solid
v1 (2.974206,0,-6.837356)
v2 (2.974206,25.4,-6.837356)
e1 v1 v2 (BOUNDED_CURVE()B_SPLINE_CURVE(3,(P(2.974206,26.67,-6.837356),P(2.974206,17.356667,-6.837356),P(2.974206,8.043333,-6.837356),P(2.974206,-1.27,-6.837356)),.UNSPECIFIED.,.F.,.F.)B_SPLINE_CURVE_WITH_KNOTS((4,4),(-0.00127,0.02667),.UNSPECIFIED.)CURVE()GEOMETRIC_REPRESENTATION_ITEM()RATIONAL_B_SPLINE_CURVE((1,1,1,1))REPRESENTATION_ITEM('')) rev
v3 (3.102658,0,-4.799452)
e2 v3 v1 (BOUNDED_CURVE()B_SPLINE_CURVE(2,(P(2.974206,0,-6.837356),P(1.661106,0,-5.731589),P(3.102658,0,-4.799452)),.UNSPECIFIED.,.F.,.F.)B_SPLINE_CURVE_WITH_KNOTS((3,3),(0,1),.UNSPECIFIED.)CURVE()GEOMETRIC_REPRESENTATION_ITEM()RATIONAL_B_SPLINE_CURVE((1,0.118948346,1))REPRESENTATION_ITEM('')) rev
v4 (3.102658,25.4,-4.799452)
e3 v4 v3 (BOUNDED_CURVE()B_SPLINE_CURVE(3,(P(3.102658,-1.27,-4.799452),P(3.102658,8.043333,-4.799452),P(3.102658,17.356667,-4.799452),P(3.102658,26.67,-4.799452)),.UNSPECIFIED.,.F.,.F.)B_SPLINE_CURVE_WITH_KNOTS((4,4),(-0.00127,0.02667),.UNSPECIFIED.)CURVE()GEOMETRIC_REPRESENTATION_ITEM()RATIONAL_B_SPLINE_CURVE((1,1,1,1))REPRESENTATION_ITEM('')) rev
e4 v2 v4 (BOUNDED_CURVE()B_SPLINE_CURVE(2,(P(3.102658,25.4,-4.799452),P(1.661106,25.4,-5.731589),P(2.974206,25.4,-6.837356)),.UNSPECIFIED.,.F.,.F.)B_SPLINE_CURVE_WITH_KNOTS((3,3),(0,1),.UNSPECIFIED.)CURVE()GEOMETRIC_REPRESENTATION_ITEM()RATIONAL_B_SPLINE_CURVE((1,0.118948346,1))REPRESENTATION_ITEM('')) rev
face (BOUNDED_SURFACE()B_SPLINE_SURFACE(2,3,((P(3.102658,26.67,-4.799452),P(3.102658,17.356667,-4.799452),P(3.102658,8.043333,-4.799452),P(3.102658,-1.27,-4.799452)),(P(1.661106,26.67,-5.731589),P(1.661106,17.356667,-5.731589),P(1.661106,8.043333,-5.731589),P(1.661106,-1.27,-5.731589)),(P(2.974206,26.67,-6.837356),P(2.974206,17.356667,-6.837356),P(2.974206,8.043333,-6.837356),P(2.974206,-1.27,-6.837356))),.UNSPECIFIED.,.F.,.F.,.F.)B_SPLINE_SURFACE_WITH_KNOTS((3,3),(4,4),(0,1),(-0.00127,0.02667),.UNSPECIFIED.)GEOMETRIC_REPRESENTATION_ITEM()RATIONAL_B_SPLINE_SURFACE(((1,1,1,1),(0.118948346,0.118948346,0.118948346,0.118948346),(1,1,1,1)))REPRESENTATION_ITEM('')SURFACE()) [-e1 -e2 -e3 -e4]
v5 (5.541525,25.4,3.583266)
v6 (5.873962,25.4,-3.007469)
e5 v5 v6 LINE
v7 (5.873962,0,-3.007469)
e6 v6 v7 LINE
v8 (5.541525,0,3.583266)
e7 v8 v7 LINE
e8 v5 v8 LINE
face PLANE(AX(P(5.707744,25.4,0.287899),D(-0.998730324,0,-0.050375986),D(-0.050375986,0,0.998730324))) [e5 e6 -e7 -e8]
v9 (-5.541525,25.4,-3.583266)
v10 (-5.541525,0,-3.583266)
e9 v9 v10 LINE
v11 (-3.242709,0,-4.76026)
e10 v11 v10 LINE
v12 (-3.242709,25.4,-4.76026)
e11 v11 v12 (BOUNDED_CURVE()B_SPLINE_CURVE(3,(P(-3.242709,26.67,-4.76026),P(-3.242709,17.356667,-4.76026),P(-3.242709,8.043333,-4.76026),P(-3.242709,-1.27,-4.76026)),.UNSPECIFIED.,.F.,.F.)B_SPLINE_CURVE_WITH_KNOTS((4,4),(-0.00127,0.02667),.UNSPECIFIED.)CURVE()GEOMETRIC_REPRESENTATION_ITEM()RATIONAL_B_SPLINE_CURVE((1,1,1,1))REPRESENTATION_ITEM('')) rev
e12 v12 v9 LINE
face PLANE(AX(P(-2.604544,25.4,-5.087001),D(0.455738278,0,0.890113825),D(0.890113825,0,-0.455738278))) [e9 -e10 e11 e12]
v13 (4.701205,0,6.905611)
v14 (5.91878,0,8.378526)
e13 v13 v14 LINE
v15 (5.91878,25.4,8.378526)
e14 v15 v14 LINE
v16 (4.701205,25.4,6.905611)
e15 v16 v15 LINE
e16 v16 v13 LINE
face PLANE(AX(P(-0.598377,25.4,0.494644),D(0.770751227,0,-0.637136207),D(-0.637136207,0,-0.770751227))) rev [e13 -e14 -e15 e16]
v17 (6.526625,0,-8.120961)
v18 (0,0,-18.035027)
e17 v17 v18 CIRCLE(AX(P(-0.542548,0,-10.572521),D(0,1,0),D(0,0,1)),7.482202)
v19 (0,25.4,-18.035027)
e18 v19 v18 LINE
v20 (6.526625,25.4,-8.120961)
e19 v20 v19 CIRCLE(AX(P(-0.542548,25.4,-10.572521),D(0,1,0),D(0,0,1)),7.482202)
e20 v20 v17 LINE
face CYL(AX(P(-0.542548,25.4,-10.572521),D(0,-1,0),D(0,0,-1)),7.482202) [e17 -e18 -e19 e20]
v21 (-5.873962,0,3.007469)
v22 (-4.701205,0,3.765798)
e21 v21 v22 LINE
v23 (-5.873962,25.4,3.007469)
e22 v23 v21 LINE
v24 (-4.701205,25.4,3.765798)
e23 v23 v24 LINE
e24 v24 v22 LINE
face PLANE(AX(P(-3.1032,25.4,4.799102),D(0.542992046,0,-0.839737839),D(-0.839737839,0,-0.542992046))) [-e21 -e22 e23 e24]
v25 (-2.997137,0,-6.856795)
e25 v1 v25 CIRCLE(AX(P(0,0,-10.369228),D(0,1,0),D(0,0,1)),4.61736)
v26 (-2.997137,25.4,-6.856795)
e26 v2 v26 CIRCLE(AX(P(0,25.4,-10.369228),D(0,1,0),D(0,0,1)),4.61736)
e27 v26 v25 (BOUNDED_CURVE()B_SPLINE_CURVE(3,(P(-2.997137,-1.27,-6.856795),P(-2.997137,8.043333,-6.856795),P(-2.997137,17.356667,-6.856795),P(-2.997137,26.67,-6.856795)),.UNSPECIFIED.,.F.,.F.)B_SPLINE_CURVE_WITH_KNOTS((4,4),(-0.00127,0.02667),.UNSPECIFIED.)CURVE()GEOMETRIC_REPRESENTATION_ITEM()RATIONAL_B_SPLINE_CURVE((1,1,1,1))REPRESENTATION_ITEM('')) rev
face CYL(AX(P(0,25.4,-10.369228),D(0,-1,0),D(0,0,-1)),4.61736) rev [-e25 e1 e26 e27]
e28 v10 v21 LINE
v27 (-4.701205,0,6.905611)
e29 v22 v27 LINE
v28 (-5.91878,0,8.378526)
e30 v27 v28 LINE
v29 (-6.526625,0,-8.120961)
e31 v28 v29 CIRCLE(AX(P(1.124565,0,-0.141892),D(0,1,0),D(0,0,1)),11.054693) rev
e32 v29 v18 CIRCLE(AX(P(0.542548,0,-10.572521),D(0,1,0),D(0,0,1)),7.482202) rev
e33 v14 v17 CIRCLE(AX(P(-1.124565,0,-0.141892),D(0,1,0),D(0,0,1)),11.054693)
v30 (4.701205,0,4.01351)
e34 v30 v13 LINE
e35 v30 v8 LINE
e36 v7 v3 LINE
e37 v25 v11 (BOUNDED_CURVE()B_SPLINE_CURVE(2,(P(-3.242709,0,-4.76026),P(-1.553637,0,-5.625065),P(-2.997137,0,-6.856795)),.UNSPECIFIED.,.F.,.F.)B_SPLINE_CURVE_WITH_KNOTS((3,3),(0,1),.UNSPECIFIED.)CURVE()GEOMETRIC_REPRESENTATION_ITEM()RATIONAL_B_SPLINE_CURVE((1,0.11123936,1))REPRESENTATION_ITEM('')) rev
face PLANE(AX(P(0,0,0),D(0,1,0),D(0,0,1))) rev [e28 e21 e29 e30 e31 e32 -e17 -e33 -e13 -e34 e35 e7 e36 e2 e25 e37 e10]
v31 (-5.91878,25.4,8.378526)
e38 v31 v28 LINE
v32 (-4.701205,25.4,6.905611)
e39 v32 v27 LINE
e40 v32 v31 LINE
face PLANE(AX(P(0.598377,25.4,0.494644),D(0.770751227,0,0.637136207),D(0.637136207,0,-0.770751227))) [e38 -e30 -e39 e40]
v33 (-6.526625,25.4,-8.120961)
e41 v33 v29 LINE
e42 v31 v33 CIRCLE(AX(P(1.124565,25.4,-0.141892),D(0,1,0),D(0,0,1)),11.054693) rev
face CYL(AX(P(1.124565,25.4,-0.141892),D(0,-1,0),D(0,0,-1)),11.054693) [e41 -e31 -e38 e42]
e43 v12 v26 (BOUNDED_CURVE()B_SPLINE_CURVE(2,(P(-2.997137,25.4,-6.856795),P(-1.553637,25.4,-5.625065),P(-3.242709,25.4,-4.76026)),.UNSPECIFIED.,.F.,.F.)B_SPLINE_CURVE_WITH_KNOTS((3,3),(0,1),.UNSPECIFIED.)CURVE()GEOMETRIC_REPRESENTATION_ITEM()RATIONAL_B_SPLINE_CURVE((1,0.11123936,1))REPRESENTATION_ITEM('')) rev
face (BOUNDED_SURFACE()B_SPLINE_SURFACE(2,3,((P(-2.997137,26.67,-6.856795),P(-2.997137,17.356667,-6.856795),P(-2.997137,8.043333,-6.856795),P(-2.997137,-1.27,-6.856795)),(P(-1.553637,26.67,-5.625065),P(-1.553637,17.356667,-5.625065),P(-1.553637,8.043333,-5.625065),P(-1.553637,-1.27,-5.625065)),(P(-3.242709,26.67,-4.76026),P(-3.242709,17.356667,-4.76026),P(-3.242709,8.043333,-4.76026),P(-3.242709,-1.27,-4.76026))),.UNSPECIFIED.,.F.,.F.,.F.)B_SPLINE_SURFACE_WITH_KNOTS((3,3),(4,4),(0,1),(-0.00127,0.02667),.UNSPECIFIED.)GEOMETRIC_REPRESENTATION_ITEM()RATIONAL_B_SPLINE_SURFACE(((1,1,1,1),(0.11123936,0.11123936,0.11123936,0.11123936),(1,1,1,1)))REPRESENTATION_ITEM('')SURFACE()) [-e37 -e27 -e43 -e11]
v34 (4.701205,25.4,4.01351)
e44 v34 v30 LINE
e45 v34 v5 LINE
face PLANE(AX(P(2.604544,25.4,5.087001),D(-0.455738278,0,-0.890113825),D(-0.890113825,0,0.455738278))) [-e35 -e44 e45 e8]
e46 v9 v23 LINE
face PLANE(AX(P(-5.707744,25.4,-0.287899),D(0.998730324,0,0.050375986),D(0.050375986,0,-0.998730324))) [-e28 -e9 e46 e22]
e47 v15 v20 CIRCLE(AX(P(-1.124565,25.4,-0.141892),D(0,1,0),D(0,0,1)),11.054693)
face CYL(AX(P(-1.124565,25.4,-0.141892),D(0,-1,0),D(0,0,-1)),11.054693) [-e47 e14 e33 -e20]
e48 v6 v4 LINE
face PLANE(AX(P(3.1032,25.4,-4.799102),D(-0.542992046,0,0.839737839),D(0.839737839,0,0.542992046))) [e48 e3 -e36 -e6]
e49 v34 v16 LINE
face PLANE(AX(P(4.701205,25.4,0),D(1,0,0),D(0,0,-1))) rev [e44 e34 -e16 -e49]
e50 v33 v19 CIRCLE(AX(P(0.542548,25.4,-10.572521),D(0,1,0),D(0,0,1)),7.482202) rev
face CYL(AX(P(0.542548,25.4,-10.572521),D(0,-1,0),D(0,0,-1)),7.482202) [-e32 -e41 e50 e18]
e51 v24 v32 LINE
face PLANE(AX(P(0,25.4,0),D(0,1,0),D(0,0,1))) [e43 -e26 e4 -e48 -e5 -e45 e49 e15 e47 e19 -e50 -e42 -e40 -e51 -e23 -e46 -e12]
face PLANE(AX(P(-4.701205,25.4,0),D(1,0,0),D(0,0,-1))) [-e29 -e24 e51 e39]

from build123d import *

# Parameters (mm, degrees)
BOSS_EXTRUDE1_DEPTH = 25.4


with BuildPart() as part:
    # Sketch3 → Boss-Extrude1 (new body)
    with BuildSketch(Plane(origin=(0, 0, 0), x_dir=(1, 0, 0), z_dir=(0, 1, 0))):
        with BuildLine():
            Line((-5.541525375, 3.58326618), (-2.47962532, 5.150959008))
            Line((-2.47962532, 5.150959008), (-2.47962532, 6.474170352))
            ThreePointArc((-2.47962532, 6.474170352), (-2.221563685, 14.417025562), (4.617359972, 10.369227654))
            ThreePointArc((4.617359972, 10.369227654), (4.047797908, 8.147663968), (2.47962532, 6.474170352))
            Line((2.47962532, 6.474170352), (2.47962532, 5.20231788))
            Line((2.47962532, 5.20231788), (5.873962228, 3.007468661))
            Line((5.873962228, 3.007468661), (5.541525375, -3.58326618))
            Line((5.541525375, -3.58326618), (4.701204968, -4.013510228))
            Line((4.701204968, -4.013510228), (4.701204968, -6.905610932))
            Line((4.701204968, -6.905610932), (5.918780254, -8.378526195))
            ThreePointArc((5.918780254, -8.378526195), (9.922634137, -0.265088751), (6.526624698, 8.120961152))
            ThreePointArc((6.526624698, 8.120961152), (5.706991897, 14.686716316), (0, 18.035026682))
            ThreePointArc((0, 18.035026682), (-5.706991897, 14.686716316), (-6.526624698, 8.120961152))
            ThreePointArc((-6.526624698, 8.120961152), (-9.922634137, -0.265088751), (-5.918780254, -8.378526195))
            Line((-5.918780254, -8.378526195), (-4.701204968, -6.905610932))
            Line((-4.701204968, -6.905610932), (-4.701204968, -3.765798027))
            Line((-4.701204968, -3.765798027), (-5.873962228, -3.007468661))
            Line((-5.873962228, -3.007468661), (-5.541525375, 3.58326618))
        make_face()
        with BuildLine():
            Line((-2.47962532, 6.474170352), (-2.47962532, 5.150959008))
            Line((-2.47962532, 5.150959008), (-1.063503338, 5.876013463))
            ThreePointArc((-1.063503338, 5.876013463), (-1.79663243, 6.115743784), (-2.47962532, 6.474170352))
        make_face()
        with BuildLine():
            ThreePointArc((2.47962532, 6.474170352), (1.921985685, 6.17089654), (1.328021538, 5.946968965))
            Line((1.328021538, 5.946968965), (2.47962532, 5.20231788))
            Line((2.47962532, 5.20231788), (2.47962532, 6.474170352))
        make_face()
    extrude(amount=BOSS_EXTRUDE1_DEPTH)

    # Fillet6
    # a fillet whose section is not a circle: 1.27 mm, written as the material it takes off along each edge
    with BuildSketch(Plane(origin=(1.328021538, -5.283304691, -5.946968965), x_dir=(0.8397378391322112, 0, 0.5429920455490709), z_dir=(0, 1, 0))) as fillet6_piece_1:
        with BuildLine():
            Bezier((2.113321876, 0), (0.3966534, 0), (0.898889741, 1.641556979), weights=[1, 0.118948346, 1])
            ThreePointArc((0.898889741, 1.641556979), (0.533488386, 0.774757636), (0, 0))
            Line((0, 0), (2.113321876, 0))
        make_face()
    extrude(amount=35.966609382, mode=Mode.SUBTRACT)
    with BuildSketch(Plane(origin=(-1.063503338, -6.120582224, -5.876013463), x_dir=(-0.891835980226881, 0, -0.4523589110128793), z_dir=(0, 1, 0))) as fillet6_piece_2:
        with BuildLine():
            Bezier((2.168149873, 0), (0.323600022, 0.445521101), (1.438773255, 1.980852292), weights=[1, 0.11123936, 1])
            Line((1.438773255, 1.980852292), (0, 0))
            ThreePointArc((0, 0), (1.084074937, 0.129064678), (2.168149873, 0))
        make_face()
    extrude(amount=37.641164449, mode=Mode.SUBTRACT)


solid = part.part
